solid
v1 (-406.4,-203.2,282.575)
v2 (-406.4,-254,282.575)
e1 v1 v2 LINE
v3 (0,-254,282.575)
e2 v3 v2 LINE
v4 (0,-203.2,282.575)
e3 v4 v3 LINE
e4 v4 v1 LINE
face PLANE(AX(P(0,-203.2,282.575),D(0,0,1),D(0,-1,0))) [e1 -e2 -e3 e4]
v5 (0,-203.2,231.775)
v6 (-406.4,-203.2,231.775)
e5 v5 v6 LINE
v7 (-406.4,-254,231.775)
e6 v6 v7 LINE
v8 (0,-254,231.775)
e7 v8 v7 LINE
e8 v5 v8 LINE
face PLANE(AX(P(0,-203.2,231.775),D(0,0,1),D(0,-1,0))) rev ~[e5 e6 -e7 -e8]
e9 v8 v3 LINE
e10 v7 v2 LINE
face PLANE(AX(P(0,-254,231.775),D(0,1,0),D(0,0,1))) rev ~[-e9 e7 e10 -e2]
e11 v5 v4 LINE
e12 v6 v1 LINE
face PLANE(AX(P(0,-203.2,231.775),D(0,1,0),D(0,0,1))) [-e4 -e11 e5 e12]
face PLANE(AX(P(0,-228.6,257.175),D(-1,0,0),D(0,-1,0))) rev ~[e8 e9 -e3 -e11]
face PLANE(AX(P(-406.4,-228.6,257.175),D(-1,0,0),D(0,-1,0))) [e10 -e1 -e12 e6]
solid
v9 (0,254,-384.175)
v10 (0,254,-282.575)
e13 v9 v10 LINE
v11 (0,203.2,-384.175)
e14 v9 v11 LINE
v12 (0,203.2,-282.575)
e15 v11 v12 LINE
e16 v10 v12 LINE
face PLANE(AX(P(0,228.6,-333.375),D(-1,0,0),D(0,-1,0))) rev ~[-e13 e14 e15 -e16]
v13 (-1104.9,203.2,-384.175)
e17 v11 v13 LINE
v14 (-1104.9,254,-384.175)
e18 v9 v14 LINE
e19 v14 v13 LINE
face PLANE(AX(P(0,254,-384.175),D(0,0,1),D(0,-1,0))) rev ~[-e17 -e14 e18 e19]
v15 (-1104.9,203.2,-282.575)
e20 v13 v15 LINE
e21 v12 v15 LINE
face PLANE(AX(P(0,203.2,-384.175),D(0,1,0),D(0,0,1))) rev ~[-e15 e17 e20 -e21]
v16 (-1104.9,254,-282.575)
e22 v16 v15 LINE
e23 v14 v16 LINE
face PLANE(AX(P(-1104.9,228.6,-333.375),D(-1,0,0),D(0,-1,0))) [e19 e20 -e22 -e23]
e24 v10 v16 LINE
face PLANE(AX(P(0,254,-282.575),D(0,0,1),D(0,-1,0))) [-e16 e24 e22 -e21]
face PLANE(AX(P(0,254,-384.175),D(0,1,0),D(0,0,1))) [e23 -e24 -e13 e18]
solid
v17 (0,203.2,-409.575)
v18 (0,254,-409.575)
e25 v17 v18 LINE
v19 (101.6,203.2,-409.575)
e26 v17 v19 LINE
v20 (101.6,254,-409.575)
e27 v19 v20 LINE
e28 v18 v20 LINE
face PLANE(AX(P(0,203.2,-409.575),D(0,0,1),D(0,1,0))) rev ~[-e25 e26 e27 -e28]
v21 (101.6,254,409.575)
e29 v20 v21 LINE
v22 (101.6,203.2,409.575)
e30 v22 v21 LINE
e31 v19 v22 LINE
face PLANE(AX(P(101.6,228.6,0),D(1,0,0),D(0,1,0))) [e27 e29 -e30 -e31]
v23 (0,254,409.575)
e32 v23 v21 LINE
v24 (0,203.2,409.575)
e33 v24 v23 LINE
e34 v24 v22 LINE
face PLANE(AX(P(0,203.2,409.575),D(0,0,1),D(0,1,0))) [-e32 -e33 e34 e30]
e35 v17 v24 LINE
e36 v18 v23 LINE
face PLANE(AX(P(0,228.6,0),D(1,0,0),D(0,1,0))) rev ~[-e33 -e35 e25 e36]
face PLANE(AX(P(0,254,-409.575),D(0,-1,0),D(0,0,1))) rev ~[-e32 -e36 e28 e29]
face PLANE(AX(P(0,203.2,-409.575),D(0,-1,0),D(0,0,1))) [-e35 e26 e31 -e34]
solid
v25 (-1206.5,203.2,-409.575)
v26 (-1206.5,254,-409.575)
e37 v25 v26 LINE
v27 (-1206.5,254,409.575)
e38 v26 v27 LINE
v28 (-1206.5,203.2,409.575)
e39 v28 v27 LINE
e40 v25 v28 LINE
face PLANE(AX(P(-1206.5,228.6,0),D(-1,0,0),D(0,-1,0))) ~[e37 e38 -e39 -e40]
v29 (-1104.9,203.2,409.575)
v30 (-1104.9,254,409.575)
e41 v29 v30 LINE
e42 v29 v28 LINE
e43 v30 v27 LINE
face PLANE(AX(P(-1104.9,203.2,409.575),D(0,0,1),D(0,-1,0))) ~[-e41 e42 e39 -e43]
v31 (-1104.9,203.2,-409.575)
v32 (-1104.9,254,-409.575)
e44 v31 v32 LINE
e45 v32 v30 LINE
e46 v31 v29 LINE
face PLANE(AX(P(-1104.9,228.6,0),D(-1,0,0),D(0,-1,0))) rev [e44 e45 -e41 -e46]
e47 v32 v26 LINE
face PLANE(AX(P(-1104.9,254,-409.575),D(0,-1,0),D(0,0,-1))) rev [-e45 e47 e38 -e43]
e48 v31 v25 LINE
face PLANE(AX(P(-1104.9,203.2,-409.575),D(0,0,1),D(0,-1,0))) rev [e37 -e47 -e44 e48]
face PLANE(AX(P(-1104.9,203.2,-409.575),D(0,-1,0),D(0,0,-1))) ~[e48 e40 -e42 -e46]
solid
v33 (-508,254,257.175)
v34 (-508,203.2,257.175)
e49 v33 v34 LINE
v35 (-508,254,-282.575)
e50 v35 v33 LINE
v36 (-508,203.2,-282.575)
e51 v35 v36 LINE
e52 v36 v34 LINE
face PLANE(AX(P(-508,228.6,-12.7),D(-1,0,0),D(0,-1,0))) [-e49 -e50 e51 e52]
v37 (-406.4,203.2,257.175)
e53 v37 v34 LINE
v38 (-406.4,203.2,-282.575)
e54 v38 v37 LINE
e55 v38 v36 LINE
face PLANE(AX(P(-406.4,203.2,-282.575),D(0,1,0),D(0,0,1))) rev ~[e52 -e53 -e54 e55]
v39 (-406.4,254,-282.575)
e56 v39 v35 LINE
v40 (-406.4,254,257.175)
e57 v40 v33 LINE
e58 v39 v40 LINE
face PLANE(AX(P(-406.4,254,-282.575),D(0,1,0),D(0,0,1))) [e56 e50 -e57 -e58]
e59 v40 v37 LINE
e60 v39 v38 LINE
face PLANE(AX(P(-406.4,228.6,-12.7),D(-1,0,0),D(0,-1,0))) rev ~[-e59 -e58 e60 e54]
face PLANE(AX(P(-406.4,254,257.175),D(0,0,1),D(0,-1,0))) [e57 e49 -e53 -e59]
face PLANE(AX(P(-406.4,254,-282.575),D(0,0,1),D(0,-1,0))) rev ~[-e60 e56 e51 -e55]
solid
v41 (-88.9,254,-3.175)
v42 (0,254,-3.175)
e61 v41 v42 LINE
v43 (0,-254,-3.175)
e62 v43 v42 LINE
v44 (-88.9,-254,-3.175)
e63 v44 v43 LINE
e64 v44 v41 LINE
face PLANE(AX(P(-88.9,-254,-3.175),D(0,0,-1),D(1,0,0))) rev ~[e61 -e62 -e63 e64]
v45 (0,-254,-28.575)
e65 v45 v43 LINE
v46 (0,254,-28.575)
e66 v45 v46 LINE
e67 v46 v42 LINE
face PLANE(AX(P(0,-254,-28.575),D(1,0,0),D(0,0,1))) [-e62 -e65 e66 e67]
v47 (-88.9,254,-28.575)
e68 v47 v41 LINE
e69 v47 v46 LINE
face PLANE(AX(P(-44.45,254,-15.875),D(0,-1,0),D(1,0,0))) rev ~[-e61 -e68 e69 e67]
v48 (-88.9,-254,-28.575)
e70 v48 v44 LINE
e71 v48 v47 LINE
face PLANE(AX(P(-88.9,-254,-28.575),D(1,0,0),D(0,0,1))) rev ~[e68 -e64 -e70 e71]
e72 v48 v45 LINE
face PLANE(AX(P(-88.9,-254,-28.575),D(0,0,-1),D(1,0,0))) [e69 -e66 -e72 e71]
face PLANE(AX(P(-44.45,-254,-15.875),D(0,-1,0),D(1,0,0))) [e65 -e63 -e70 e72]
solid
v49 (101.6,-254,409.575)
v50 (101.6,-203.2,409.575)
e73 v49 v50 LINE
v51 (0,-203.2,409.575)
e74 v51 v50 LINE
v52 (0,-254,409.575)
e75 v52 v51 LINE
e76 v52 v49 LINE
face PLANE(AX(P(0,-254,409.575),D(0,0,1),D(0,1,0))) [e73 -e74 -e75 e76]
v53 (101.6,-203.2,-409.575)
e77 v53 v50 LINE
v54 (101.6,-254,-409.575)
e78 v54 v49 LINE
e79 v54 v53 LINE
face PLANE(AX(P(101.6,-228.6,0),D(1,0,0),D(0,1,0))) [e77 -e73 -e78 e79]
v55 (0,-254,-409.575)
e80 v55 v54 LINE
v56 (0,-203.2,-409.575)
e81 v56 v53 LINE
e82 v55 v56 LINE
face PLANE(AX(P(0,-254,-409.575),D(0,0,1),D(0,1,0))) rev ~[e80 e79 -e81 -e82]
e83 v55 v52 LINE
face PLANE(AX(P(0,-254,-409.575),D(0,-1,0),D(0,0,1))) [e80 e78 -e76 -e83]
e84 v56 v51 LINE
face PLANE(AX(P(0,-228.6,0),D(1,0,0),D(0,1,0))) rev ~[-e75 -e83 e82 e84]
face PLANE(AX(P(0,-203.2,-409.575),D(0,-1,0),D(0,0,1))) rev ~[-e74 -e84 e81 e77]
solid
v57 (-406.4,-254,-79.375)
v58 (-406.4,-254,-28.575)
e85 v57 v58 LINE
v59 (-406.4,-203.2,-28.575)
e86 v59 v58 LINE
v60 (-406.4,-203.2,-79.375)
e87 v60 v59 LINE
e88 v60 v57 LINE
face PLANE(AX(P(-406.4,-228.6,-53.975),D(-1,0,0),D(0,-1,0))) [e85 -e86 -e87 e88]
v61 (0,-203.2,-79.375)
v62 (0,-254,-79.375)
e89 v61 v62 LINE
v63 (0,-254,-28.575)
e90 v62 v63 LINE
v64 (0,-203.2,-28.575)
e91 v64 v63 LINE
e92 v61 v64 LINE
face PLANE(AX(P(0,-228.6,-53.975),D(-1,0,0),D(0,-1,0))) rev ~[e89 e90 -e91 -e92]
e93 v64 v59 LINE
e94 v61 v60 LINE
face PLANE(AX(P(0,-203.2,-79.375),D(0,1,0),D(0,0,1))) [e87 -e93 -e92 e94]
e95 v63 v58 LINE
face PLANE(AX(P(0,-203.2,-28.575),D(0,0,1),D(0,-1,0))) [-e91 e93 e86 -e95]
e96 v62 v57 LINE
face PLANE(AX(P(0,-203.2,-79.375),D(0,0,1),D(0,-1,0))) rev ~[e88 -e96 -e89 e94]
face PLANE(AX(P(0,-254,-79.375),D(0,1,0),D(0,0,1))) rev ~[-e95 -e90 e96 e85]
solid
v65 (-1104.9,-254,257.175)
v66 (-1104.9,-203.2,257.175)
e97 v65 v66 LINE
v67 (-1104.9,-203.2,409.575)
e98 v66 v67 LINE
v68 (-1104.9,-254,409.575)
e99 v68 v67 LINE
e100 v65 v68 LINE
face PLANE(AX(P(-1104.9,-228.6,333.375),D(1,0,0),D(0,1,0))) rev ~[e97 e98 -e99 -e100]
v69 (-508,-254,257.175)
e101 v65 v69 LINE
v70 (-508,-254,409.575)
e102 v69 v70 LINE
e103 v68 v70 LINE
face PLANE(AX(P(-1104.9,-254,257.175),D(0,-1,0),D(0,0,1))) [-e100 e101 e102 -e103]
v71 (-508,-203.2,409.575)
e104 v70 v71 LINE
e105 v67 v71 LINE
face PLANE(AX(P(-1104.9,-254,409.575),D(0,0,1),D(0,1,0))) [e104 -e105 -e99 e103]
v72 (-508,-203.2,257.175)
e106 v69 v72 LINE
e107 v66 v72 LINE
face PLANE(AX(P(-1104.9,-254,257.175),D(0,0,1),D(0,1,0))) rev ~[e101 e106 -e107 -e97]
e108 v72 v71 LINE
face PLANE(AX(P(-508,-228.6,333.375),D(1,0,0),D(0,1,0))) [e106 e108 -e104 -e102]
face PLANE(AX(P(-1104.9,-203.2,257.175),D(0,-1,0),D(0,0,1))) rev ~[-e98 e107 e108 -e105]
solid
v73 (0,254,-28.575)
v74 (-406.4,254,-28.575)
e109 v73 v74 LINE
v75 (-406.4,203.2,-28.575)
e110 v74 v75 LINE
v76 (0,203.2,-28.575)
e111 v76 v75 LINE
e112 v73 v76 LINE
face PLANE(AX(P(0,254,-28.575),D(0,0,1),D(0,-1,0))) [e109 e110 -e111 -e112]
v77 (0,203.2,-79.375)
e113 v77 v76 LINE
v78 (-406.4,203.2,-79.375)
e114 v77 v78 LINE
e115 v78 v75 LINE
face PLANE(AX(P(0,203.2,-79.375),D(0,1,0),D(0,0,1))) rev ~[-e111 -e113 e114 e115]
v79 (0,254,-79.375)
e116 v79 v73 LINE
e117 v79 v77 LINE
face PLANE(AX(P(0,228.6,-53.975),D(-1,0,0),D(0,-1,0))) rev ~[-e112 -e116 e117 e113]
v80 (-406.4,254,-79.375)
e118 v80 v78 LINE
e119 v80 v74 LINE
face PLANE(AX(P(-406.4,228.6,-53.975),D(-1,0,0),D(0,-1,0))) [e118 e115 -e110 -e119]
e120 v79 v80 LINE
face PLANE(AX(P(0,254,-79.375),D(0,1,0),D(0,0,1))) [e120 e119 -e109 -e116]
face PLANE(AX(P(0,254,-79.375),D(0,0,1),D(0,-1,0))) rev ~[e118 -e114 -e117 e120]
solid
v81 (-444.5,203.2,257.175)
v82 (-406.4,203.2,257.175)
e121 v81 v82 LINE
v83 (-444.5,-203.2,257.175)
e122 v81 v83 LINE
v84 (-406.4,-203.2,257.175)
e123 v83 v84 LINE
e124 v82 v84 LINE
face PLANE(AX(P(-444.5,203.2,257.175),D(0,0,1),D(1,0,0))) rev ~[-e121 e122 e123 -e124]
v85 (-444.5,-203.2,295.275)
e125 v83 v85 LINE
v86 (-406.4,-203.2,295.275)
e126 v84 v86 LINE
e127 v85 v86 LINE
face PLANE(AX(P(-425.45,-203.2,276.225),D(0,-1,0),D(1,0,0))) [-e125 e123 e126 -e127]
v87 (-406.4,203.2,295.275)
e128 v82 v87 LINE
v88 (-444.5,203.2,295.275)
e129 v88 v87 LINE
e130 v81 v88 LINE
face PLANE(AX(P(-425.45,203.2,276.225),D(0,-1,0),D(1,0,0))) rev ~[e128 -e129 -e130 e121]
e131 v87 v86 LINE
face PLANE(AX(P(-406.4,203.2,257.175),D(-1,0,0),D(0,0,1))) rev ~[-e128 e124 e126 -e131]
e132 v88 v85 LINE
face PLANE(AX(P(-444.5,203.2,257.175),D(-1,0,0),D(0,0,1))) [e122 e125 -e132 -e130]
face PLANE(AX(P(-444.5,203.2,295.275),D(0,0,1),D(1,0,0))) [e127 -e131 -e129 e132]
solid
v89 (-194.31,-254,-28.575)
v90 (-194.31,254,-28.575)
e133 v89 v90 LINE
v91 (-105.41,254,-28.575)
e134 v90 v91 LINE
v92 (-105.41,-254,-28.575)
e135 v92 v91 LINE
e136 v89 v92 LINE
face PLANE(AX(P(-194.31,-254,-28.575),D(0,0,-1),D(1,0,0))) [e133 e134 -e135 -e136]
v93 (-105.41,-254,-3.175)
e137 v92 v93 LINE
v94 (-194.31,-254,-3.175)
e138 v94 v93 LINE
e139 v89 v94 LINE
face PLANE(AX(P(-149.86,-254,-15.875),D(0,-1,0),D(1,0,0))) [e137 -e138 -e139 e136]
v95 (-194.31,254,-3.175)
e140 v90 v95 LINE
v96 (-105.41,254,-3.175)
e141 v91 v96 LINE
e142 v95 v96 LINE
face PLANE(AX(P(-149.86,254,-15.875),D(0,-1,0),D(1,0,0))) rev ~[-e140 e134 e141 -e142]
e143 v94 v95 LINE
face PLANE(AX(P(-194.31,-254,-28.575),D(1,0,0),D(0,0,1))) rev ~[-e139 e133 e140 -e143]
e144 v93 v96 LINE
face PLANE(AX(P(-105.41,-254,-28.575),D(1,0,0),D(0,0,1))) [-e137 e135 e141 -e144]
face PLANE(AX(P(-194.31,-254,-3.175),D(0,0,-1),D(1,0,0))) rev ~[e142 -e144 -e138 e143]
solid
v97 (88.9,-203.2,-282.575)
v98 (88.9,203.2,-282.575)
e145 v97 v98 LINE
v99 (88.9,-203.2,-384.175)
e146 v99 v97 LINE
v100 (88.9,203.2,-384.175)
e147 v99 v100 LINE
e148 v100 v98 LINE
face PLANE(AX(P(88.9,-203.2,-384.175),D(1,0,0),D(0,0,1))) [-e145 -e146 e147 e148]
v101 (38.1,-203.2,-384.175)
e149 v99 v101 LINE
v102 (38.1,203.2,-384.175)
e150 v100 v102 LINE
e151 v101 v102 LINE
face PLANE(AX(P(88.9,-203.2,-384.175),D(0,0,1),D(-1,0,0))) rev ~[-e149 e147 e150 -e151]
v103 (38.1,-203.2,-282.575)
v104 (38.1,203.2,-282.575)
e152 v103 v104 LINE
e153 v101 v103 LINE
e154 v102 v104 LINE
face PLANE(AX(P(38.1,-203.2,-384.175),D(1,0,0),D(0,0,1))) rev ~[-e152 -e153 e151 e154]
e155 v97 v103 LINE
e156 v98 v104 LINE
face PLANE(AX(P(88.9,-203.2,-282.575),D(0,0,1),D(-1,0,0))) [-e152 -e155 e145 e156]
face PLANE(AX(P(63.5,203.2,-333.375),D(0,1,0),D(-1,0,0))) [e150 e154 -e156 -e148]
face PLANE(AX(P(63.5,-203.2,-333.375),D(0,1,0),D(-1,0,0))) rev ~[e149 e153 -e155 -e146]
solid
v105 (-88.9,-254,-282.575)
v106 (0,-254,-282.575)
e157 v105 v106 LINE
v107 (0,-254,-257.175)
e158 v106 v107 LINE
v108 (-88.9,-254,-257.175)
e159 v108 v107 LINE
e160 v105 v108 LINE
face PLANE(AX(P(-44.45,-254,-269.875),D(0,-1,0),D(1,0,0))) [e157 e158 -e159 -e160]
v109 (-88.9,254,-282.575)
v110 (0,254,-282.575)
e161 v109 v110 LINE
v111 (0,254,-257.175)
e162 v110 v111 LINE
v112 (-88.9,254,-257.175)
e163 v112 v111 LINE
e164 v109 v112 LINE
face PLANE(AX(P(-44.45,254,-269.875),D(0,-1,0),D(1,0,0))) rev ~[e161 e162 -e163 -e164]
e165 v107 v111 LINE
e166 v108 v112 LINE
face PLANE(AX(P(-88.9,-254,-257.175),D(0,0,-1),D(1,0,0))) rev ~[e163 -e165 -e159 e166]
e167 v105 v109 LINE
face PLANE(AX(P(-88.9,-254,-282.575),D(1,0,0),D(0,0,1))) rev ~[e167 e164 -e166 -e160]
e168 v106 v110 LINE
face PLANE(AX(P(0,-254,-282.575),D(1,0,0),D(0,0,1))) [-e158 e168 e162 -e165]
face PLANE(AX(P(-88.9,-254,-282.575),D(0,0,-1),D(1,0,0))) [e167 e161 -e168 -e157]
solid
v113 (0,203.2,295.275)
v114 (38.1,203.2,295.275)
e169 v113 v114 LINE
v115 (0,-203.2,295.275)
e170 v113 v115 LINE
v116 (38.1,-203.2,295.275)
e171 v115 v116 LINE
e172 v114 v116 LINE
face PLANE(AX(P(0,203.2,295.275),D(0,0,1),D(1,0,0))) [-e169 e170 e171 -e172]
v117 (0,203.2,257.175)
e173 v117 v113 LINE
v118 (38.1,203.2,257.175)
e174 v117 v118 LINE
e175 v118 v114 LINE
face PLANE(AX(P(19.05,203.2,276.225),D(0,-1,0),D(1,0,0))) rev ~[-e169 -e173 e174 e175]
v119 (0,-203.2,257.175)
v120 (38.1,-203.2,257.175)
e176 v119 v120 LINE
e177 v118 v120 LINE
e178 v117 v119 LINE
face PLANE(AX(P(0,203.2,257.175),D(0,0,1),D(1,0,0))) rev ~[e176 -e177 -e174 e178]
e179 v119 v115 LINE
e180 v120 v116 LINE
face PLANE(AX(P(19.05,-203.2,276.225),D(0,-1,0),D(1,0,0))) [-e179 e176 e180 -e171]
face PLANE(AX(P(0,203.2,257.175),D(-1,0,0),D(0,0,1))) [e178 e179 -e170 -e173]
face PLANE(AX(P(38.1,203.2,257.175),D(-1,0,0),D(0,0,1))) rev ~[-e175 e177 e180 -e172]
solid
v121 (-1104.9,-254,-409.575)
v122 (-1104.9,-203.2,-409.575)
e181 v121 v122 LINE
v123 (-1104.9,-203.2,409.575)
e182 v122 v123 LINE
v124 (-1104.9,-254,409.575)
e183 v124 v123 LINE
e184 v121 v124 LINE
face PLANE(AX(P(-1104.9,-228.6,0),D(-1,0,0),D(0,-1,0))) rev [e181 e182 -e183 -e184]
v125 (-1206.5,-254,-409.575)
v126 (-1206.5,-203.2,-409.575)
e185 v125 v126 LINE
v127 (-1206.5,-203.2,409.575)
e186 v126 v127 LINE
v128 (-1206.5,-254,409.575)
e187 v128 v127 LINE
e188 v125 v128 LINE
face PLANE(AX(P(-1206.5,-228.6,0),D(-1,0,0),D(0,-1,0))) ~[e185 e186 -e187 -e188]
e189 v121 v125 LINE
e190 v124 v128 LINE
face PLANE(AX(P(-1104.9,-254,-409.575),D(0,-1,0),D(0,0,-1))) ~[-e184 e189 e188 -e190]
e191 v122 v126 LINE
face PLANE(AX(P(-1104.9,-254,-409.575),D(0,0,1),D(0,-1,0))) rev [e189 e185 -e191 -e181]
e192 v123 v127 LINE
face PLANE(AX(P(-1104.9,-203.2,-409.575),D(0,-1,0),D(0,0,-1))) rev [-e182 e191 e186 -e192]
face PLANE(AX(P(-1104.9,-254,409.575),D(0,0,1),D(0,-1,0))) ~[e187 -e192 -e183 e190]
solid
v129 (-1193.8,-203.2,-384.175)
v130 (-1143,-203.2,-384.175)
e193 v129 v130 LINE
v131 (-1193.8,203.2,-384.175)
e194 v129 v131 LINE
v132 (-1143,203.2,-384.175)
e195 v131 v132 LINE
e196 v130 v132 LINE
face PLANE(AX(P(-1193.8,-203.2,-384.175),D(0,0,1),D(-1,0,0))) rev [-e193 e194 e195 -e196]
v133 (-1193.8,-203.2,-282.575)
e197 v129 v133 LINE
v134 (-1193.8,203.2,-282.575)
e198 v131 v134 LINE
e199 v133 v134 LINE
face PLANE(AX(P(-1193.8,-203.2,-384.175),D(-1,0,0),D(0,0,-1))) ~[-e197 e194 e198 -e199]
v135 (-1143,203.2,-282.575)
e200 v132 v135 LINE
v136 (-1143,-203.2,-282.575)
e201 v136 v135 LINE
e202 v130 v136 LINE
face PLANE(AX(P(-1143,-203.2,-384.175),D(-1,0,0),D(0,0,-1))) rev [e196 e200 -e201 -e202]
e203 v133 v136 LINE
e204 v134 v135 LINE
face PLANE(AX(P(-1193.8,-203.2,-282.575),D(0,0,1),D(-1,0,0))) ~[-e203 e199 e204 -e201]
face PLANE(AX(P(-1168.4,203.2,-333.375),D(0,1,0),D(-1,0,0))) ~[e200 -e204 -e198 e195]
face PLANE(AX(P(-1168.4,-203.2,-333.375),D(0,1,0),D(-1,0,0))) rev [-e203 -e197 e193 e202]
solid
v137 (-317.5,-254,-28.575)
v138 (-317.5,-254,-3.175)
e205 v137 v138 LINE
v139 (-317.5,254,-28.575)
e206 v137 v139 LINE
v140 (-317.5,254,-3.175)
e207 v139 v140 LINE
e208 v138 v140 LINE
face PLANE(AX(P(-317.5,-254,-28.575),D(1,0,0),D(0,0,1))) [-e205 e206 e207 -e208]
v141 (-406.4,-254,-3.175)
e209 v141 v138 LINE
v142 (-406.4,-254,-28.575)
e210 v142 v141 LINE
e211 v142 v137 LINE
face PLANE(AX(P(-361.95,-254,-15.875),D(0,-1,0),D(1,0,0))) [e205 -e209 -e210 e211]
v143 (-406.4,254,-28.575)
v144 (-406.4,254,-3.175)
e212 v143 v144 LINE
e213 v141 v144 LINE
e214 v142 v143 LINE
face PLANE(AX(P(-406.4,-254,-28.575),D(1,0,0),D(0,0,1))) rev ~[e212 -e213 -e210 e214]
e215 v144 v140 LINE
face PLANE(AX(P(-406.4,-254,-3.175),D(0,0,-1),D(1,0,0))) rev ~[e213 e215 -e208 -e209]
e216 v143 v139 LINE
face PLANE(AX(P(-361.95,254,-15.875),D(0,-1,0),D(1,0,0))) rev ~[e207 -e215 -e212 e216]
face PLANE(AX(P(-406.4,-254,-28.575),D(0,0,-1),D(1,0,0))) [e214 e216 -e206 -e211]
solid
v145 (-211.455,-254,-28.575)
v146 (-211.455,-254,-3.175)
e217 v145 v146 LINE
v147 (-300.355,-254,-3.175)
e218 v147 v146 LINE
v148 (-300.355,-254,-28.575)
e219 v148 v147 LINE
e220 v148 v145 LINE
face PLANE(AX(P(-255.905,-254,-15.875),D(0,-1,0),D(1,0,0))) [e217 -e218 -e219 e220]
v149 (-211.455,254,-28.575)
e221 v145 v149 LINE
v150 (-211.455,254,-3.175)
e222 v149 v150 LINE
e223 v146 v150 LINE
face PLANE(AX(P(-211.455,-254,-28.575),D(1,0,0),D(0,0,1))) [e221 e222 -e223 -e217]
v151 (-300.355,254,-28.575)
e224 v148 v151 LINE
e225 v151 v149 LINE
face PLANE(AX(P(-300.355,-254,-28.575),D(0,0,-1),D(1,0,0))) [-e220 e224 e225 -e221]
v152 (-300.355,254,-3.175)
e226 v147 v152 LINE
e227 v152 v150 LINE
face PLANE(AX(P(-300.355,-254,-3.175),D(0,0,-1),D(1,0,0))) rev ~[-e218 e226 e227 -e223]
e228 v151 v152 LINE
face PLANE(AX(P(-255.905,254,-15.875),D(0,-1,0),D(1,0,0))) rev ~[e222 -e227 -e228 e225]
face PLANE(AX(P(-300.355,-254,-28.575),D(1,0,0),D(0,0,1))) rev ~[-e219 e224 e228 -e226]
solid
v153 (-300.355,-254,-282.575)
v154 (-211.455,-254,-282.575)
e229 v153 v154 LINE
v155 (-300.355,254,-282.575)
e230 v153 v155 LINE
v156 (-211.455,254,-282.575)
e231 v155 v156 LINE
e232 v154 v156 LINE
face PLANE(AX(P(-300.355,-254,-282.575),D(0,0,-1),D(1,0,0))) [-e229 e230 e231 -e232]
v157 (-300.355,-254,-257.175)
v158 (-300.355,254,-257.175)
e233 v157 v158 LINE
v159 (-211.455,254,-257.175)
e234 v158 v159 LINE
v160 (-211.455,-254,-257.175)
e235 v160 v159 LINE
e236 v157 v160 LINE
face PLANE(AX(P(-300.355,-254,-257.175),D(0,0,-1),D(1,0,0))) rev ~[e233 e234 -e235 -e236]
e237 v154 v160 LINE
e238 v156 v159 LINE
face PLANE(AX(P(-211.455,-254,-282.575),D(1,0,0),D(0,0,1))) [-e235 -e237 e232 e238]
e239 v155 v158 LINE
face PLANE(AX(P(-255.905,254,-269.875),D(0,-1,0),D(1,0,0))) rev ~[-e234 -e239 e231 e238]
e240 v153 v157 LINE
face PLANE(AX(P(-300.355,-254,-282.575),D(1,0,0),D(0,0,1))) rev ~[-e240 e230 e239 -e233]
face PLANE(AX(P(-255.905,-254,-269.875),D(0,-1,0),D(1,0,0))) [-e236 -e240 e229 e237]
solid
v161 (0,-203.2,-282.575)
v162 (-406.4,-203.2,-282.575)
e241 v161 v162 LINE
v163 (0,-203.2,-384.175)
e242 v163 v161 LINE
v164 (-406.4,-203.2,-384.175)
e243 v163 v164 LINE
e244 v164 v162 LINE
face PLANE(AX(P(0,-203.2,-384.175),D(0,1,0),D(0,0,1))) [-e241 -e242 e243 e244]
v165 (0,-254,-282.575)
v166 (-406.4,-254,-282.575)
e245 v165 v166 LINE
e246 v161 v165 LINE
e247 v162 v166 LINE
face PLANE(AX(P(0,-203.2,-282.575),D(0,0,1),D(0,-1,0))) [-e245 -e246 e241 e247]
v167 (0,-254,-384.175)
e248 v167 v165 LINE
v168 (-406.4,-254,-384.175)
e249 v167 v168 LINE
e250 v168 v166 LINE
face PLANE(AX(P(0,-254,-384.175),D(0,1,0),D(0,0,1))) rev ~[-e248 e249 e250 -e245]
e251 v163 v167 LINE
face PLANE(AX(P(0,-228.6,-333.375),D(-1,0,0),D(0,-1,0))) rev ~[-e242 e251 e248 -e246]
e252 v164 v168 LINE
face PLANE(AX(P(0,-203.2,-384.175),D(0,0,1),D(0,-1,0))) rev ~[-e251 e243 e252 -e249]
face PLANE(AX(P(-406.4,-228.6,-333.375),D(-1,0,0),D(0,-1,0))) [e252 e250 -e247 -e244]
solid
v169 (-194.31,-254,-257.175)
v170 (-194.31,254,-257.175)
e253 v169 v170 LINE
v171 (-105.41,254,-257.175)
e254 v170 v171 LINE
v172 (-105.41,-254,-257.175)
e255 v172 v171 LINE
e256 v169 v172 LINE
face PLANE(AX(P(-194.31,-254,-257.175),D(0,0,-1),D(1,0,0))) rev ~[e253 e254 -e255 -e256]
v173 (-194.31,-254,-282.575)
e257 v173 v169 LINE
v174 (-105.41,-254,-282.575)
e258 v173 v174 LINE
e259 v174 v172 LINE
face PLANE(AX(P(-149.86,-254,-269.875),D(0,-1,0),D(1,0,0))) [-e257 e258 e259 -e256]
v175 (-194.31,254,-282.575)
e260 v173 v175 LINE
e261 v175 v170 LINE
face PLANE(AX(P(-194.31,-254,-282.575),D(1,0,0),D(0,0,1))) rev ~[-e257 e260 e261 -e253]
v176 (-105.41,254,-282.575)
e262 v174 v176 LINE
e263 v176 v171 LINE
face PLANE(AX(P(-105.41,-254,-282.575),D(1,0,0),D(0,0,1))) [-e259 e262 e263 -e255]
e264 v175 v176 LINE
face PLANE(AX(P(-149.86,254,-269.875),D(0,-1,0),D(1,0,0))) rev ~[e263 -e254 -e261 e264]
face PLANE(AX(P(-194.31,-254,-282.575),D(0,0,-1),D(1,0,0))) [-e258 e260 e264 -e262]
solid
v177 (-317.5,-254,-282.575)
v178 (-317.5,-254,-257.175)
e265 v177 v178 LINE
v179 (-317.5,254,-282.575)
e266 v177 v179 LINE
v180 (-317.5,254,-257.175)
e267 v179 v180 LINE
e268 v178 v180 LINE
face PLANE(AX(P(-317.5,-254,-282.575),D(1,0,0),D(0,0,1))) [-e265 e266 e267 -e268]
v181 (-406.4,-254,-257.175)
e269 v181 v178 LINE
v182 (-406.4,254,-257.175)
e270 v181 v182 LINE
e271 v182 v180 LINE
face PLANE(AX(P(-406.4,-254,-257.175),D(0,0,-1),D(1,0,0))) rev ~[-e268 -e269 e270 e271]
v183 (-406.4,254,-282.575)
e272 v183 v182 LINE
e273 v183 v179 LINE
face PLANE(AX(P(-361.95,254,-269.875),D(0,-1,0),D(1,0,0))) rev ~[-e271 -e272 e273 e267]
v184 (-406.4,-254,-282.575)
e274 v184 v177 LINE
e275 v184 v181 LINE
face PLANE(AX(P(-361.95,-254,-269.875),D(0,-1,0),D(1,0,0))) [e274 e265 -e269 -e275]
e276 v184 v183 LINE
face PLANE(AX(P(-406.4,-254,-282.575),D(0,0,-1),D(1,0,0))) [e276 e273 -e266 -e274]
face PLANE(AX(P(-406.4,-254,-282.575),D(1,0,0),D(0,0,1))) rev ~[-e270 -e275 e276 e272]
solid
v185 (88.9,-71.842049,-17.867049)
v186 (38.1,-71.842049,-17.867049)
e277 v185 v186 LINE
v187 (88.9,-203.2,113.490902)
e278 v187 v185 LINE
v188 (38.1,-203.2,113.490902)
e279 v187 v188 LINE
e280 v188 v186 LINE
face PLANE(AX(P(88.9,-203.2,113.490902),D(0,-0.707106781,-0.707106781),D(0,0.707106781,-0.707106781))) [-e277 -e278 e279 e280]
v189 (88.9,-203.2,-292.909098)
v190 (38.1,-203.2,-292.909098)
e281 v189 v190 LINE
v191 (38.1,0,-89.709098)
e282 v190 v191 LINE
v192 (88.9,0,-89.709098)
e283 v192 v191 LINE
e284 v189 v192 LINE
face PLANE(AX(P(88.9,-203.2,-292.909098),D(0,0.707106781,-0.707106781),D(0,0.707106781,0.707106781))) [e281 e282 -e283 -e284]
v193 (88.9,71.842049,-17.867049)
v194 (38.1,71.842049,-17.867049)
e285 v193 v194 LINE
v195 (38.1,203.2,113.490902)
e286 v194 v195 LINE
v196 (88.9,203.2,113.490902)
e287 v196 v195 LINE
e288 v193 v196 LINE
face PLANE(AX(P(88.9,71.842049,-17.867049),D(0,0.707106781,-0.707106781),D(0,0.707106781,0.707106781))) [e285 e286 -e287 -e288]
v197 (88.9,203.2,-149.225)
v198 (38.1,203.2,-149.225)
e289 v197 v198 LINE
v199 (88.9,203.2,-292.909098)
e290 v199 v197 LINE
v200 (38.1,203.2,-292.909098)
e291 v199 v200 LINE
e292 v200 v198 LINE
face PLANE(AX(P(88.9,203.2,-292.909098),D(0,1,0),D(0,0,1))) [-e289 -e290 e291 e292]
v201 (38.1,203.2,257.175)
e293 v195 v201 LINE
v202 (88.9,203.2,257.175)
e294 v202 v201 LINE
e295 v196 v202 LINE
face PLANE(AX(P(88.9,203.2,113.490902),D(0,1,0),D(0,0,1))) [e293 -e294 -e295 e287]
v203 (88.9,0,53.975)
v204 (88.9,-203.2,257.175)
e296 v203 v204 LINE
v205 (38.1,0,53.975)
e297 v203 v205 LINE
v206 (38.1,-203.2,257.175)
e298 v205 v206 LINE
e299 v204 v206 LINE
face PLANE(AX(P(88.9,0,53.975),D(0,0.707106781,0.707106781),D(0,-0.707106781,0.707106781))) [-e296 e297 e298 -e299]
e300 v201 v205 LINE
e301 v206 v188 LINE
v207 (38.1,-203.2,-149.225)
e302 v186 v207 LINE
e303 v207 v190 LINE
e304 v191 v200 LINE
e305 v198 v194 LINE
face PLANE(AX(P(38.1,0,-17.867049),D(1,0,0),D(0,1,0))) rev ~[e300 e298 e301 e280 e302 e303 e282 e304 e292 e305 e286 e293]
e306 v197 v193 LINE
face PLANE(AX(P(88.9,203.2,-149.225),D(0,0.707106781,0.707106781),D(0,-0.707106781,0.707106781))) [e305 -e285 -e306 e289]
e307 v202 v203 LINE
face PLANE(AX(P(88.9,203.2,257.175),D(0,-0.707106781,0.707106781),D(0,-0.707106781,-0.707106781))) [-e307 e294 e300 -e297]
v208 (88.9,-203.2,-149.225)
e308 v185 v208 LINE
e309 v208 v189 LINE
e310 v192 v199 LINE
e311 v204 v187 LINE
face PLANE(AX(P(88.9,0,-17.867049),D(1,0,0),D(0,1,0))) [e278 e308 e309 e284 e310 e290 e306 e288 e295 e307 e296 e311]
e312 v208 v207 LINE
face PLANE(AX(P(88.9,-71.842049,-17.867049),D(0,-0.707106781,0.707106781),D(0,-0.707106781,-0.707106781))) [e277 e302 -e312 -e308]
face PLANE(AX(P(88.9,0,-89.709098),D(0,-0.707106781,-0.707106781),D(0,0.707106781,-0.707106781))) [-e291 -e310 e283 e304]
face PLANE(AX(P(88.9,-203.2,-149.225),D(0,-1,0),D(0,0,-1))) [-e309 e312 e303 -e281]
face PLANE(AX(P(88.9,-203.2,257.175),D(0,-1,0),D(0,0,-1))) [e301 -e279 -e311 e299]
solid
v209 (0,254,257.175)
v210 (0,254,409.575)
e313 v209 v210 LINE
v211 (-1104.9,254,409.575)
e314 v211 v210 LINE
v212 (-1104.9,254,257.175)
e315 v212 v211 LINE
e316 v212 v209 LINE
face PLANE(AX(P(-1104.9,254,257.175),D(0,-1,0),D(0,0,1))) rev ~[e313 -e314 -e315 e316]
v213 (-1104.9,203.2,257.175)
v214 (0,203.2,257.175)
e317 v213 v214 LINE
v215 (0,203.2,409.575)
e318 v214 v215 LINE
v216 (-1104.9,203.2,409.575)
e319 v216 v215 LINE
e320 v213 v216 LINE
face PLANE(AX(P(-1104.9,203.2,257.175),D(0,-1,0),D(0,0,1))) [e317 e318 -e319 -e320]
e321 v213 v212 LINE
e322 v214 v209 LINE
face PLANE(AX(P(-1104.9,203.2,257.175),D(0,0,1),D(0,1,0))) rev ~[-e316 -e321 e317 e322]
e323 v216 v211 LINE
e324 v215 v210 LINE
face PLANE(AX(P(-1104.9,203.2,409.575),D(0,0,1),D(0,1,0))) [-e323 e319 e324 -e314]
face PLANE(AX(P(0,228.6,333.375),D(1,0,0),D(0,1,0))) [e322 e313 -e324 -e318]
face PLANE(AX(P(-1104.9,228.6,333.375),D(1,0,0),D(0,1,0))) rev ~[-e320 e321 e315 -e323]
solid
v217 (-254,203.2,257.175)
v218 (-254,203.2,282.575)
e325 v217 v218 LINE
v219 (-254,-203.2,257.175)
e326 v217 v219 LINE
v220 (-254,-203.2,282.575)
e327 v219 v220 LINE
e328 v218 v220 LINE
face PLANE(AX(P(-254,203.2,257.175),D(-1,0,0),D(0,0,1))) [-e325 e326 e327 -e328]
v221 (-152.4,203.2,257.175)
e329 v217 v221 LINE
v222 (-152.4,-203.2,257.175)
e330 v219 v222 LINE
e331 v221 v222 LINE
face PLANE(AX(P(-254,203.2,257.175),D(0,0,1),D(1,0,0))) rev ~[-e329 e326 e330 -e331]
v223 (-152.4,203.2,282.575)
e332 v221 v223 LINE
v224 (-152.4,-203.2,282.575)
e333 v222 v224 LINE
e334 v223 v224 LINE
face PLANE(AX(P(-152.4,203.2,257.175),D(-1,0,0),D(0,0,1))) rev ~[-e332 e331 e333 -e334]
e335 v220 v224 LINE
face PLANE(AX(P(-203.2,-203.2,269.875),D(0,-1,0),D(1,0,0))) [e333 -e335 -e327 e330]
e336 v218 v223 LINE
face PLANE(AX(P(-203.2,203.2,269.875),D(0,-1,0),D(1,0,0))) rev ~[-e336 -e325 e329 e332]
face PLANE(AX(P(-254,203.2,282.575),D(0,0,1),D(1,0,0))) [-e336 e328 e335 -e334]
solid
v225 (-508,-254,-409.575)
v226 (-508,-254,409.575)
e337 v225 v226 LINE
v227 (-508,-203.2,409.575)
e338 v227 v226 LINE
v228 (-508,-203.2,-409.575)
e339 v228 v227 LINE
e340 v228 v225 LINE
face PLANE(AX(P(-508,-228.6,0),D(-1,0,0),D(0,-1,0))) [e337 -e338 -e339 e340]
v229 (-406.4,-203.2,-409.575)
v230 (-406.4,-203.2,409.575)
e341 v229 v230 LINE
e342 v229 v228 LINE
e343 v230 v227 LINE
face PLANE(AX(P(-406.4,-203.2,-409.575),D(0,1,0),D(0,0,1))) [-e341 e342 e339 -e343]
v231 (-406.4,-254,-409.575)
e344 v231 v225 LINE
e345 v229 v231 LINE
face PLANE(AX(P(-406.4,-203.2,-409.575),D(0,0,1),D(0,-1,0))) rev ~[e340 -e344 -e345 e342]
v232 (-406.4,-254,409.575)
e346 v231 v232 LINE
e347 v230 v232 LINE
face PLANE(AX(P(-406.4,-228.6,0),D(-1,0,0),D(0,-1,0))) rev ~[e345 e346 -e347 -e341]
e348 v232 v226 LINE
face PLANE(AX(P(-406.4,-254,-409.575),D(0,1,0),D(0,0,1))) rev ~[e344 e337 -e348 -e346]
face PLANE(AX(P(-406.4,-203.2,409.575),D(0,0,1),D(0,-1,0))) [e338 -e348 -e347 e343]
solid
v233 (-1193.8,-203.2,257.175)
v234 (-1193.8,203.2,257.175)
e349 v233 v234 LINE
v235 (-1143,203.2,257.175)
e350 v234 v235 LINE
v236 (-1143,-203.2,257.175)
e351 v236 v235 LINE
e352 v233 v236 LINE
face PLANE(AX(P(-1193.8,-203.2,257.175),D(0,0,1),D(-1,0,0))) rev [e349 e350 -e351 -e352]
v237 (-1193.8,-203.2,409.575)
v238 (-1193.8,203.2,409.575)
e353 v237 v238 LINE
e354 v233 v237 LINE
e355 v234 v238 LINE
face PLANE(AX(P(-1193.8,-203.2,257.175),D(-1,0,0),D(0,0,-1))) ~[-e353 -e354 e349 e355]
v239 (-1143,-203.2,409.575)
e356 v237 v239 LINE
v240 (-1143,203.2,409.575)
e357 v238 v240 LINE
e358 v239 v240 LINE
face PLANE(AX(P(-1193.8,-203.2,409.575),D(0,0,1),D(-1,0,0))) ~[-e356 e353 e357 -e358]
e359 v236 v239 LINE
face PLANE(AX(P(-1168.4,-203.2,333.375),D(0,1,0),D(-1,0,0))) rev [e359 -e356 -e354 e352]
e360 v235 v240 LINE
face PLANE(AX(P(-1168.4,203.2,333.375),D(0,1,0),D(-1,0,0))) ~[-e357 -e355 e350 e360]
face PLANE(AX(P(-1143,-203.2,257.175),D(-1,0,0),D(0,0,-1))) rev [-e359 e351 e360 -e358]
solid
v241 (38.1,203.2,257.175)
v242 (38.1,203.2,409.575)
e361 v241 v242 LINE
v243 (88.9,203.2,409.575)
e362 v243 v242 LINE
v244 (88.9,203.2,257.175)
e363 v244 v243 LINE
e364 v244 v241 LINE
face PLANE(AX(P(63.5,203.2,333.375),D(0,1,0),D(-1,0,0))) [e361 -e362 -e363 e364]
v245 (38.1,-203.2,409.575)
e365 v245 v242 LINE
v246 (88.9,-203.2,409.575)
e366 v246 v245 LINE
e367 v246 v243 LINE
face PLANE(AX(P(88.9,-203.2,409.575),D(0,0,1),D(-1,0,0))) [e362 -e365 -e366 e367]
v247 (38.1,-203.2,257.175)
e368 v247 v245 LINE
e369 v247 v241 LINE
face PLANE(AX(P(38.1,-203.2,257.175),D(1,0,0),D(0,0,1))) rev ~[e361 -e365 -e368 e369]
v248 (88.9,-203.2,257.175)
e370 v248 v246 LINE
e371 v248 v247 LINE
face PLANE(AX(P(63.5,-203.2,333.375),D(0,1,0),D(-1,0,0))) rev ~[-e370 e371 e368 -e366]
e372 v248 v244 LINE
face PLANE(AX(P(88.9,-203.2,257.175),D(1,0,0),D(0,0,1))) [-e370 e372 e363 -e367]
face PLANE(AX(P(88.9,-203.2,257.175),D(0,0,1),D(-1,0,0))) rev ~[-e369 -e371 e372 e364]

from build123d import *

# Parameters (mm, degrees)
F0_W      = 50.8
F0_H      = 819.15
F1_DEPTH  = 101.6
F2_W      = 50.8
F2_H      = 152.4
F3_DEPTH  = 406.4
F2_H_2    = 101.6
F5_DEPTH  = 50.8
F9_W      = 50.8
F9_H      = 50.8
F10_DEPTH = 406.4
F6_W      = 50.8
F6_H      = 101.6
F12_DEPTH = 1104.9
F11_W     = 50.8
F11_H     = 819.15
F13_DEPTH = 101.6
F11_H_2   = 539.75
F14_W     = 88.9
F14_H     = 25.4
F15_DEPTH = 508
F16_DEPTH = 406.4
F17_W     = 50.8
F17_H     = 152.4
F18_DEPTH = 596.9
F19_DEPTH = 1104.9
F20_W     = 101.6
F20_H     = 25.4
F21_DEPTH = 406.4
F20_W_2   = 38.0999999999
F20_H_2   = 38.1
F20_W_3   = 38.1


# Not quite as in the source:
# - a feature names something its author has since deleted; it is built from what else it names


with BuildPart() as f1:
    # F0 (on Right) → F1 (new body)
    with BuildSketch(Plane.YZ):
        with Locations((-228.6, 0)):
            Rectangle(F0_W, F0_H)
    extrude(amount=F1_DEPTH)


with BuildPart() as f1b:
    # F0 (on Right) → F1, piece 2 (new body)
    with BuildSketch(Plane.YZ):
        with Locations((228.6, 0)):
            Rectangle(F0_W, F0_H)
    extrude(amount=F1_DEPTH)


with BuildPart() as f3:
    # F2 (on face) → F3 (new body, through all)
    with BuildSketch(Plane(origin=(0, -203.2, 0), x_dir=(-1, 0, 0), z_dir=(0, 1, 0))):
        with Locations((-63.5, 333.375)):
            Rectangle(F2_W, F2_H)
    extrude(amount=F3_DEPTH)


with BuildPart() as f3b:
    # F2 (on face) → F3, piece 2 (new body, through all)
    with BuildSketch(Plane(origin=(0, -203.2, 0), x_dir=(-1, 0, 0), z_dir=(0, 1, 0))):
        with Locations((-63.5, -333.375)):
            Rectangle(F2_W, F2_H_2)
    extrude(amount=F3_DEPTH)


with BuildPart() as f5:
    # F4 (on face) → F5 (new body)
    with BuildSketch(Plane.YZ.offset(88.9)):
        Polygon((0, 53.975), (-203.2, 257.175), (-203.2, 113.4909020629), (-71.8420489686, -17.8670489685), (0, -89.7090979371), (203.2, -292.9090979371), (203.2, -149.225), (71.8420489685, -17.8670489685), align=None)
        Polygon((203.2, 257.175), (0, 53.975), (71.8420489685, -17.8670489685), (203.2, 113.4909020629), align=None)
        Polygon((0, -89.7090979371), (-71.8420489686, -17.8670489685), (-203.2, -149.225), (-203.2, -292.9090979371), align=None)
    extrude(amount=-F5_DEPTH)


with BuildPart() as f8_1:
    # F8: instance of F1b
    add(f1b.part.mirror(Plane(origin=(-552.45, -228.6, 0), x_dir=(0, 1, 0), z_dir=(-1, 0, 0))))


with BuildPart() as f8_2:
    # F8: instance of F3
    add(f3.part.mirror(Plane(origin=(-552.45, -228.6, 0), x_dir=(0, 1, 0), z_dir=(-1, 0, 0))))


with BuildPart() as f8_3:
    # F8: instance of F1
    add(f1.part.mirror(Plane(origin=(-552.45, -228.6, 0), x_dir=(0, 1, 0), z_dir=(-1, 0, 0))))


with BuildPart() as f8_4:
    # F8: instance of F3b
    add(f3b.part.mirror(Plane(origin=(-552.45, -228.6, 0), x_dir=(0, 1, 0), z_dir=(-1, 0, 0))))


with BuildPart() as f10:
    # F9 (on face) → F10 (new body)
    with BuildSketch(Plane(origin=(0, 0, 0), x_dir=(0, -1, 0), z_dir=(-1, 0, 0))):
        with Locations((228.6, 257.175)):
            Rectangle(F9_W, F9_H)
    extrude(amount=F10_DEPTH)


with BuildPart() as f10b:
    # F9 (on face) → F10, piece 2 (new body)
    with BuildSketch(Plane(origin=(0, 0, 0), x_dir=(0, -1, 0), z_dir=(-1, 0, 0))):
        with Locations((228.6, -53.975)):
            Rectangle(F9_W, F9_H)
    extrude(amount=F10_DEPTH)


with BuildPart() as f10c:
    # F9 (on face) → F10, piece 3 (new body)
    with BuildSketch(Plane(origin=(0, 0, 0), x_dir=(0, -1, 0), z_dir=(-1, 0, 0))):
        with Locations((-228.6, -53.975)):
            Rectangle(F9_W, F9_H)
    extrude(amount=F10_DEPTH)


with BuildPart() as f12:
    # F6 (on face) → F12 (new body, through all)
    with BuildSketch(Plane(origin=(0, 0, 0), x_dir=(0, -1, 0), z_dir=(-1, 0, 0))):
        with Locations((-228.6, -333.375)):
            Rectangle(F6_W, F6_H)
    extrude(amount=F12_DEPTH)


with BuildPart() as f13:
    # F11 (on face) → F13 (new body)
    with BuildSketch(Plane(origin=(-406.4, 0, 0), x_dir=(0, -1, 0), z_dir=(-1, 0, 0))):
        with Locations((228.6, 0)):
            Rectangle(F11_W, F11_H)
    extrude(amount=F13_DEPTH)


with BuildPart() as f13b:
    # F11 (on face) → F13, piece 2 (new body)
    with BuildSketch(Plane(origin=(-406.4, 0, 0), x_dir=(0, -1, 0), z_dir=(-1, 0, 0))):
        with Locations((-228.6, -12.7)):
            Rectangle(F11_W, F11_H_2)
    extrude(amount=F13_DEPTH)


with BuildPart() as f15:
    # F14 (on face) → F15 (new body, through all)
    with BuildSketch(Plane.XZ.offset(254)):
        with Locations((-44.45, -15.875)):
            Rectangle(F14_W, F14_H)
    extrude(amount=-F15_DEPTH)


with BuildPart() as f15b:
    # F14 (on face) → F15, piece 2 (new body, through all)
    with BuildSketch(Plane.XZ.offset(254)):
        with Locations((-361.95, -15.875)):
            Rectangle(F14_W, F14_H)
    extrude(amount=-F15_DEPTH)


with BuildPart() as f15c:
    # F14 (on face) → F15, piece 3 (new body, through all)
    with BuildSketch(Plane.XZ.offset(254)):
        with Locations((-255.905, -15.875)):
            Rectangle(F14_W, F14_H)
    extrude(amount=-F15_DEPTH)


with BuildPart() as f15d:
    # F14 (on face) → F15, piece 4 (new body, through all)
    with BuildSketch(Plane.XZ.offset(254)):
        with Locations((-149.86, -15.875)):
            Rectangle(F14_W, F14_H)
    extrude(amount=-F15_DEPTH)


with BuildPart() as f15e:
    # F14 (on face) → F15, piece 5 (new body, through all)
    with BuildSketch(Plane.XZ.offset(254)):
        with Locations((-44.45, -269.875)):
            Rectangle(F14_W, F14_H)
    extrude(amount=-F15_DEPTH)


with BuildPart() as f15f:
    # F14 (on face) → F15, piece 6 (new body, through all)
    with BuildSketch(Plane.XZ.offset(254)):
        with Locations((-361.95, -269.875)):
            Rectangle(F14_W, F14_H)
    extrude(amount=-F15_DEPTH)


with BuildPart() as f15g:
    # F14 (on face) → F15, piece 7 (new body, through all)
    with BuildSketch(Plane.XZ.offset(254)):
        with Locations((-255.905, -269.875)):
            Rectangle(F14_W, F14_H)
    extrude(amount=-F15_DEPTH)


with BuildPart() as f15h:
    # F14 (on face) → F15, piece 8 (new body, through all)
    with BuildSketch(Plane.XZ.offset(254)):
        with Locations((-149.86, -269.875)):
            Rectangle(F14_W, F14_H)
    extrude(amount=-F15_DEPTH)


with BuildPart() as f16:
    # F6 (on face) → F16 (new body, through all)
    with BuildSketch(Plane(origin=(0, 0, 0), x_dir=(0, -1, 0), z_dir=(-1, 0, 0))):
        with Locations((228.6, -333.375)):
            Rectangle(F6_W, F6_H)
    extrude(amount=F16_DEPTH)


with BuildPart() as f18:
    # F17 (on face) → F18 (new body, through all)
    with BuildSketch(Plane.YZ.offset(-1104.9)):
        with Locations((-228.6, 333.375)):
            Rectangle(F17_W, F17_H)
    extrude(amount=F18_DEPTH)


with BuildPart() as f19:
    # F17 (on face) → F19 (new body, through all)
    with BuildSketch(Plane.YZ.offset(-1104.9)):
        with Locations((228.6, 333.375)):
            Rectangle(F17_W, F17_H)
    extrude(amount=F19_DEPTH)


with BuildPart() as f21:
    # F20 (on face) → F21 (new body, through all)
    with BuildSketch(Plane.XZ.offset(-203.2)):
        with Locations((-203.2, 269.875)):
            Rectangle(F20_W, F20_H)
    extrude(amount=F21_DEPTH)


with BuildPart() as f21b:
    # F20 (on face) → F21, piece 2 (new body, through all)
    with BuildSketch(Plane.XZ.offset(-203.2)):
        with Locations((19.0500000001, 276.225)):
            Rectangle(F20_W_2, F20_H_2)
    extrude(amount=F21_DEPTH)


with BuildPart() as f21c:
    # F20 (on face) → F21, piece 3 (new body, through all)
    with BuildSketch(Plane.XZ.offset(-203.2)):
        with Locations((-425.45, 276.225)):
            Rectangle(F20_W_3, F20_H_2)
    extrude(amount=F21_DEPTH)


solid = Compound([f1.part, f1b.part, f3.part, f3b.part, f5.part, f8_1.part, f8_2.part, f8_3.part, f8_4.part, f10.part, f10b.part, f10c.part, f12.part, f13.part, f13b.part, f15.part, f15b.part, f15c.part, f15d.part, f15e.part, f15f.part, f15g.part, f15h.part, f16.part, f18.part, f19.part, f21.part, f21b.part, f21c.part])
